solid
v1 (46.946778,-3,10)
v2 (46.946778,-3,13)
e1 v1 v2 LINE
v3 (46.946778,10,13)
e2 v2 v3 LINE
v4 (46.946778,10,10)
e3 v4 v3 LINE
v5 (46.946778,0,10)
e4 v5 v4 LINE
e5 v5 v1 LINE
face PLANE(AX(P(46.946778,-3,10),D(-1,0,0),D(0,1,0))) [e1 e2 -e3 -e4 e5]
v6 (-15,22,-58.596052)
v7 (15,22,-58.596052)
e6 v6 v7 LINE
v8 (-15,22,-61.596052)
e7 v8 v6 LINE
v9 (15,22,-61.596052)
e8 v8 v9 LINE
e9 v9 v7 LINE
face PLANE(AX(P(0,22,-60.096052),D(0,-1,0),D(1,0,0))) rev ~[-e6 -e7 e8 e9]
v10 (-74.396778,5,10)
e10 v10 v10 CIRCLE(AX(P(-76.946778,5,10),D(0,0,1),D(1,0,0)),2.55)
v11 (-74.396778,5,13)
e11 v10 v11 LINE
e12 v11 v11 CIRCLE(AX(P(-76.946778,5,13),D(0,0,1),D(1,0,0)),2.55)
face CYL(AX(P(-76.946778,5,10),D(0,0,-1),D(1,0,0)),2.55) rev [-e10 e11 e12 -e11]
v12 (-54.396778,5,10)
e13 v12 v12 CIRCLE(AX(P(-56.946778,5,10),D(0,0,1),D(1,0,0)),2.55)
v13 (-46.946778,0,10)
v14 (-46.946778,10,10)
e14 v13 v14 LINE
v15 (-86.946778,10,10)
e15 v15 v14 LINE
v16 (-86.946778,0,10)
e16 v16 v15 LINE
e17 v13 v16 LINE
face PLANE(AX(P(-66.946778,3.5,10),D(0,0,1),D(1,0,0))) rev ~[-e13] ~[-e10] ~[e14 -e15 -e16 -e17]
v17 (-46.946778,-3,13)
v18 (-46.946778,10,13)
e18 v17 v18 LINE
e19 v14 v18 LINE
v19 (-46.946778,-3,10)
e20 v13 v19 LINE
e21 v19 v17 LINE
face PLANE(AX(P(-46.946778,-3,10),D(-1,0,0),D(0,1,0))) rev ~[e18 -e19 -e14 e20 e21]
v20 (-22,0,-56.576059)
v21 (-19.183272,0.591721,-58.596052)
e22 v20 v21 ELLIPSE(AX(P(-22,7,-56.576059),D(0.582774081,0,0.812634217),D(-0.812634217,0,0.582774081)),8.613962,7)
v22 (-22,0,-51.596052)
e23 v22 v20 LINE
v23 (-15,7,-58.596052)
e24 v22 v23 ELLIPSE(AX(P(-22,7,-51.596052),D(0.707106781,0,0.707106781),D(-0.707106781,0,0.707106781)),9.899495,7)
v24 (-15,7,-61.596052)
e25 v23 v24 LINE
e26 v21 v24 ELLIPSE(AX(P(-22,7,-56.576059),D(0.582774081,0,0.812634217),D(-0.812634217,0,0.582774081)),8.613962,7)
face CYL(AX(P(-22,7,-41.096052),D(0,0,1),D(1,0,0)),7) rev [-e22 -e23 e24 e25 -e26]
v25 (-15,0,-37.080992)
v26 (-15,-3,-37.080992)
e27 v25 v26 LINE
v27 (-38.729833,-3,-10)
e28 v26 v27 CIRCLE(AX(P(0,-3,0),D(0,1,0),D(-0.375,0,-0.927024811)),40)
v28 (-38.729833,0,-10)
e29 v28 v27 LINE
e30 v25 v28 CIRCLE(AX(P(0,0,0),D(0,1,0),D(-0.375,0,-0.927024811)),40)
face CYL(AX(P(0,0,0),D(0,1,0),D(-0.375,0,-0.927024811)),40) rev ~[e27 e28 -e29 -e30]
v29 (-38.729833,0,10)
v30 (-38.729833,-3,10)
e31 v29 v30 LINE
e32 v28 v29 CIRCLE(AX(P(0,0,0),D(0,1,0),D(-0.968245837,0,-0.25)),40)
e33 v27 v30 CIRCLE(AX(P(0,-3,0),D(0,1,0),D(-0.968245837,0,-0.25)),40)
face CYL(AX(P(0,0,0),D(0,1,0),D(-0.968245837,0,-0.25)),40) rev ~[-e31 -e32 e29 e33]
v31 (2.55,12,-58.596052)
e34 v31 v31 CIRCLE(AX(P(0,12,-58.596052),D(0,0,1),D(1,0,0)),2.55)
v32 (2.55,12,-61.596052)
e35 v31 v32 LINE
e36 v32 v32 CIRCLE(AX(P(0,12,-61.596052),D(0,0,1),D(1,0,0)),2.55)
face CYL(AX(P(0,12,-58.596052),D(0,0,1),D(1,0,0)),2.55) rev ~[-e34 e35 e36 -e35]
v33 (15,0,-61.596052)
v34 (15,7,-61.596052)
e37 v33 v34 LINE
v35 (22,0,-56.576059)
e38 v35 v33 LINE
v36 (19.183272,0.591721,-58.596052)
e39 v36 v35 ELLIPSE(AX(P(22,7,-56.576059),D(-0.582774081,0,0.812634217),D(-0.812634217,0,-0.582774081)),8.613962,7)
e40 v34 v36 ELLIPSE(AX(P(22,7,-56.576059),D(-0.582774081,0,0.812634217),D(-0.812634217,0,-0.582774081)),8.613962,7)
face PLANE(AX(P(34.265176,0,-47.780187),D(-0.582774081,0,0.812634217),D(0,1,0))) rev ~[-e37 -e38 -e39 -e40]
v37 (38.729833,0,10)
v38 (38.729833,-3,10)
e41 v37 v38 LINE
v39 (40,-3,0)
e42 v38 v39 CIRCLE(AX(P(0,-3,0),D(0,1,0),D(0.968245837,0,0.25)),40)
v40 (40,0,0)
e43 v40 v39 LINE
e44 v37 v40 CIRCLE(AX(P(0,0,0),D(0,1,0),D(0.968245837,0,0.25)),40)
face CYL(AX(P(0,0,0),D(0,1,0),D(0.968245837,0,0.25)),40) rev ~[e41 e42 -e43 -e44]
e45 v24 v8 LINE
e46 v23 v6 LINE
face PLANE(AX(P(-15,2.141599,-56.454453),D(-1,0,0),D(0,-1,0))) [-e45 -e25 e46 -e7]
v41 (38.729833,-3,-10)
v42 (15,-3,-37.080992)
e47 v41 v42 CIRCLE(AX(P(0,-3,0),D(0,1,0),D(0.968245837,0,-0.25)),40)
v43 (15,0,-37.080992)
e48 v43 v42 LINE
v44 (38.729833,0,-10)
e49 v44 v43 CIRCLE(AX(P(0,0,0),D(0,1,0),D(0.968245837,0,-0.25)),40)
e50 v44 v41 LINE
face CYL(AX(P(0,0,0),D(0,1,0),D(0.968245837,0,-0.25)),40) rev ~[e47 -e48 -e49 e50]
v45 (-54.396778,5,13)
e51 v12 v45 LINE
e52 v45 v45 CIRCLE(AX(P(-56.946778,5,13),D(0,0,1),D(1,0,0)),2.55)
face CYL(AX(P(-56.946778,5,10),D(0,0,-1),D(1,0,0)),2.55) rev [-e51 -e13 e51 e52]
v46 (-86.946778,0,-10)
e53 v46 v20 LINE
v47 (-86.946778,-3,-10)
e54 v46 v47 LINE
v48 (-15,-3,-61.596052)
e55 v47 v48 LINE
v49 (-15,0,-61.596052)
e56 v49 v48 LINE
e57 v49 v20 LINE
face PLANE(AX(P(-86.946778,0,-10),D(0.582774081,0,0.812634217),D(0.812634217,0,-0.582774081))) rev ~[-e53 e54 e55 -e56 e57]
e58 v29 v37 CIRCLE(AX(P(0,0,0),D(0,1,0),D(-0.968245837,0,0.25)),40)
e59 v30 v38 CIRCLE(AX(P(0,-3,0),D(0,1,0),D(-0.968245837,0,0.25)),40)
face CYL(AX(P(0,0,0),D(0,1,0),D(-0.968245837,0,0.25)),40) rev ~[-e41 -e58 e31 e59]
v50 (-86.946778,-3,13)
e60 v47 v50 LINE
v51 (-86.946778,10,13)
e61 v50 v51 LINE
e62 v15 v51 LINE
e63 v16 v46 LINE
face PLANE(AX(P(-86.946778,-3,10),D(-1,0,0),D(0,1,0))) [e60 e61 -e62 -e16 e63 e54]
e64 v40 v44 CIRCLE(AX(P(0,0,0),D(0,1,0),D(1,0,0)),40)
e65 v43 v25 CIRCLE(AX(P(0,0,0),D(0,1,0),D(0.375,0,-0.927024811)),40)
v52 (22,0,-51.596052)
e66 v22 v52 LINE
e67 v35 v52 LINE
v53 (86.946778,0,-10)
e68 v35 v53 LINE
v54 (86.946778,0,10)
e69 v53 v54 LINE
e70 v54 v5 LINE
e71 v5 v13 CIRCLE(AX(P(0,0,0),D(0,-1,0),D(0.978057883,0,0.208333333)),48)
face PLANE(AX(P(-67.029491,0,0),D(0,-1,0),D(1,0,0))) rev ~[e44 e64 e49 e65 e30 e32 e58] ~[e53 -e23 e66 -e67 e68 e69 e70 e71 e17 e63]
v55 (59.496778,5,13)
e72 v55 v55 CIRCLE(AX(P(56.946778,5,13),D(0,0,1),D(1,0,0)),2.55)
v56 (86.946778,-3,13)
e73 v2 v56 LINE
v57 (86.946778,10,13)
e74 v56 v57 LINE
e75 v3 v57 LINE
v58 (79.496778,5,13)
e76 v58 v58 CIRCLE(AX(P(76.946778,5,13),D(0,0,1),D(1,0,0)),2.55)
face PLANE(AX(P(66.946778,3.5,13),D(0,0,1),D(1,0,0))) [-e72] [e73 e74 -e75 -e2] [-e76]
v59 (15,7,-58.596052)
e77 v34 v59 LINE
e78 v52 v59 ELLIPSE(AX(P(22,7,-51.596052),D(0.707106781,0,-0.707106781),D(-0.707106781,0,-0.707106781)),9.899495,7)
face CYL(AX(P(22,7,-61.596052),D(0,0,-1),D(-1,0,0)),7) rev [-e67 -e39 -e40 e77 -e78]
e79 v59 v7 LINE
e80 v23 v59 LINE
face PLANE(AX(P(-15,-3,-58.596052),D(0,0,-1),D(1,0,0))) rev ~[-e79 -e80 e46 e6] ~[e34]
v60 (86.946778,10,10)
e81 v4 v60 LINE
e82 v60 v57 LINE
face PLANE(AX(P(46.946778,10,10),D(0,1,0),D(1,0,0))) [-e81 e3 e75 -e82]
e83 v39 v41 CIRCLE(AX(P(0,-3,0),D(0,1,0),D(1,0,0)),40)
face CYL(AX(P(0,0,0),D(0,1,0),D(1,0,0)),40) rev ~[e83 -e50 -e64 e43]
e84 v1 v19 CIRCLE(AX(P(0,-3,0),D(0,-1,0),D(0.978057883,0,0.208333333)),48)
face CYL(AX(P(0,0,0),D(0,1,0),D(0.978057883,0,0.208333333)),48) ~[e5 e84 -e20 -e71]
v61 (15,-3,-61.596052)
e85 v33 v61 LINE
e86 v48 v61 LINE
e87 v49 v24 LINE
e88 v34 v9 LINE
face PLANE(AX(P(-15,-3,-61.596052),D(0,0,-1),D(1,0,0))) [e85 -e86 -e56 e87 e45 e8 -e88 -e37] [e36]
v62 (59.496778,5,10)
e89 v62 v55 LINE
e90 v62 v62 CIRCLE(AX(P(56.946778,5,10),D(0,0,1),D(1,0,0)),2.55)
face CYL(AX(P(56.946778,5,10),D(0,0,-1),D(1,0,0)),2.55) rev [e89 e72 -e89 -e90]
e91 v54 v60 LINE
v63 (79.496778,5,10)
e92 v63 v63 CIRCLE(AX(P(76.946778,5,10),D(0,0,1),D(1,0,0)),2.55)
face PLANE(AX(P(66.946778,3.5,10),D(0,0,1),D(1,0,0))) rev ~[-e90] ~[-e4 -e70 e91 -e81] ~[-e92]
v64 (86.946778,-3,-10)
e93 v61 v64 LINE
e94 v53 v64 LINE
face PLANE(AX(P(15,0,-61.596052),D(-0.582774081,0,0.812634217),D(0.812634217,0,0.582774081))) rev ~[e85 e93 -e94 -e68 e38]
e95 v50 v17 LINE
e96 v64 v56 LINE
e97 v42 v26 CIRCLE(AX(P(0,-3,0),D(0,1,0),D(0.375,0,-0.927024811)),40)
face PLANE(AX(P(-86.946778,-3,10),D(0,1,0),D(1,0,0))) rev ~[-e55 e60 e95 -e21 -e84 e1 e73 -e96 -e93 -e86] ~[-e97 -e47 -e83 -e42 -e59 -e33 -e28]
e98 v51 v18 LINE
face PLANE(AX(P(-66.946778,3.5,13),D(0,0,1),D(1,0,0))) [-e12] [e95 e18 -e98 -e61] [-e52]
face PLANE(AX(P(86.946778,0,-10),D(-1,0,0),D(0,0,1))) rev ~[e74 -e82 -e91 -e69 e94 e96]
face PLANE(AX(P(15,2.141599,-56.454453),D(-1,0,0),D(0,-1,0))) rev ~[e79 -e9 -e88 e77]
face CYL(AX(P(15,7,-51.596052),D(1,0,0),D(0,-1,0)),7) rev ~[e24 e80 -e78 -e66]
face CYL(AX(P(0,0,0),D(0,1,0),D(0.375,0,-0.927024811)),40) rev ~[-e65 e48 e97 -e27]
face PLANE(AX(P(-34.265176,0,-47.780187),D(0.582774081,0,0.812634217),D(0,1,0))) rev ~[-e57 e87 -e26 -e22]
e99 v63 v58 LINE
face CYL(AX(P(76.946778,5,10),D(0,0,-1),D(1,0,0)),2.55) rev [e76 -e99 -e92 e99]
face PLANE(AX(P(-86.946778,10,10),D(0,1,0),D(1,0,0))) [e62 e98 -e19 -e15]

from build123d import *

# Parameters (mm, degrees)
F0_W         = 30
F0_H         = 3
F1_DEPTH     = 3
F2_W         = 40
F2_H         = 13
F2_R         = 2.55
F3_DEPTH     = 3
F4_W         = 30
F4_H         = 3
F5_DEPTH     = 25
F6_R         = 2.55
F7_DEPTH     = 3
F8_T1_DEPTH  = 30
F8_T6_DEPTH  = 20.5
F8_T11_DEPTH = 20.5
F8_T17_DEPTH = 20.5
F8_T22_DEPTH = 47.5
F8_T30_DEPTH = 20.5
F8_T35_DEPTH = 47.5


# Not quite as in the source:
# - a fillet or chamfer that OpenCascade refuses, or shapes differently, is made with other operations: its cross-section is extruded or revolved along the edge and cut away or added
# - a feature names something its author has since deleted; it is built from what else it names


with BuildPart() as f1:
    # F0 (on Front) → F1 (new body)
    with BuildSketch(Plane.XZ):
        with BuildLine():
            ThreePointArc((-46.9467783772, -10), (-48, 0), (-46.9467783772, 10))
            Line((-46.9467783772, 10), (-86.9467783772, 10))
            Line((-86.9467783772, 10), (-86.9467783772, -10))
            Line((-86.9467783772, -10), (-46.9467783772, -10))
        make_face()
        with BuildLine():
            Line((86.9467783772, 10), (46.9467783772, 10))
            ThreePointArc((46.9467783772, 10), (47.7359684206, 5.0276554125), (48, 0))
            ThreePointArc((48, 0), (47.7359684206, -5.0276554125), (46.9467783772, -10))
            Line((46.9467783772, -10), (86.9467783772, -10))
            Line((86.9467783772, -10), (86.9467783772, 10))
        make_face()
        with BuildLine():
            Line((15, -58.5960524607), (15, -45.5960524607))
            ThreePointArc((15, -45.5960524607), (0, -48), (-15, -45.5960524607))
            Line((-15, -45.5960524607), (-15, -58.5960524607))
            Line((-15, -58.5960524607), (15, -58.5960524607))
        make_face()
        with BuildLine():
            ThreePointArc((-38.7298334621, 10), (0, 40), (38.7298334621, 10))
            Line((38.7298334621, 10), (46.9467783772, 10))
            ThreePointArc((46.9467783772, 10), (0, 48), (-46.9467783772, 10))
            Line((-46.9467783772, 10), (-38.7298334621, 10))
        make_face()
        with BuildLine():
            ThreePointArc((-15, -37.0809924355), (-30.0843611996, -26.3615479669), (-38.7298334621, -10))
            Line((-38.7298334621, -10), (-46.9467783772, -10))
            ThreePointArc((-46.9467783772, -10), (-35.7228298925, -32.060558705), (-15, -45.5960524607))
            Line((-15, -45.5960524607), (-15, -37.0809924355))
        make_face()
        with BuildLine():
            Line((46.9467783772, -10), (38.7298334621, -10))
            ThreePointArc((38.7298334621, -10), (30.0843611996, -26.3615479669), (15, -37.0809924355))
            Line((15, -37.0809924355), (15, -45.5960524607))
            ThreePointArc((15, -45.5960524607), (35.7228298925, -32.060558705), (46.9467783772, -10))
        make_face()
        with BuildLine():
            ThreePointArc((-38.7298334621, -10), (-40, 0), (-38.7298334621, 10))
            Line((-38.7298334621, 10), (-46.9467783772, 10))
            ThreePointArc((-46.9467783772, 10), (-48, 0), (-46.9467783772, -10))
            Line((-46.9467783772, -10), (-38.7298334621, -10))
        make_face()
        with BuildLine():
            Line((15, -45.5960524607), (15, -37.0809924355))
            ThreePointArc((15, -37.0809924355), (0, -40), (-15, -37.0809924355))
            Line((-15, -37.0809924355), (-15, -45.5960524607))
            ThreePointArc((-15, -45.5960524607), (0, -48), (15, -45.5960524607))
        make_face()
        with BuildLine():
            ThreePointArc((38.7298334621, 10), (39.6811878507, 5.0401716993), (40, 0))
            ThreePointArc((40, 0), (39.6811878507, -5.0401716993), (38.7298334621, -10))
            Line((38.7298334621, -10), (46.9467783772, -10))
            ThreePointArc((46.9467783772, -10), (47.7359684206, -5.0276554125), (48, 0))
            ThreePointArc((48, 0), (47.7359684206, 5.0276554125), (46.9467783772, 10))
            Line((46.9467783772, 10), (38.7298334621, 10))
        make_face()
        with Locations((0, -60.0960524607)):
            Rectangle(F0_W, F0_H)
        with BuildLine():
            ThreePointArc((-15, -45.5960524607), (-35.7228298925, -32.060558705), (-46.9467783772, -10))
            Line((-46.9467783772, -10), (-86.9467783772, -10))
            Line((-86.9467783772, -10), (-15, -61.5960524607))
            Line((-15, -61.5960524607), (-15, -58.5960524607))
            Line((-15, -58.5960524607), (-15, -45.5960524607))
        make_face()
        with BuildLine():
            Line((86.9467783772, -10), (46.9467783772, -10))
            ThreePointArc((46.9467783772, -10), (35.7228298925, -32.060558705), (15, -45.5960524607))
            Line((15, -45.5960524607), (15, -58.5960524607))
            Line((15, -58.5960524607), (15, -61.5960524607))
            Line((15, -61.5960524607), (86.9467783772, -10))
        make_face()
    extrude(amount=F1_DEPTH)

    # F2 (on face) → F3 (join)
    with BuildSketch(Plane.XY.offset(10)):
        with Locations((-66.9467783772, 3.5)):
            Rectangle(F2_W, F2_H)
        with Locations((-76.9467783772, 5)):
            Circle(F2_R, mode=Mode.SUBTRACT)
        with Locations((-56.9467783772, 5)):
            Circle(F2_R, mode=Mode.SUBTRACT)
        with Locations((66.9467783772, 3.5)):
            Rectangle(F2_W, F2_H)
        with Locations((56.9467783772, 5)):
            Circle(F2_R, mode=Mode.SUBTRACT)
        with Locations((76.9467783772, 5)):
            Circle(F2_R, mode=Mode.SUBTRACT)
    extrude(amount=F3_DEPTH)

    # F4 (on face) → F5 (join)
    with BuildSketch(Plane.XZ.offset(3)):
        with Locations((0, -60.0960524607)):
            Rectangle(F4_W, F4_H)
    extrude(amount=-F5_DEPTH)

    # F6 (on face) → F7 (cut, through all)
    with BuildSketch(Plane.XY.offset(-58.5960524607)):
        with Locations((0, 12)):
            Circle(F6_R)
    extrude(amount=-F7_DEPTH, mode=Mode.SUBTRACT)

    # F8: fillet of radius 7 on 3 edges, made by hand

    # F8_s2 → F8_t1 (join)
    with BuildSketch(Plane.YZ.offset(-15)):
        with BuildLine():
            ThreePointArc((0, -51.5960524607), (2.0502525317, -56.545799929), (7, -58.5960524607))
            Line((7, -58.5960524607), (0, -58.5960524607))
            Line((0, -58.5960524607), (0, -51.5960524607))
        make_face()
    extrude(amount=F8_T1_DEPTH)


with BuildPart() as f8_tool4:
    # F8_s5 → F8_t6 (new body)
    with BuildSketch(Plane.XY.offset(-58.5960524607)):
        with BuildLine():
            ThreePointArc((-15, 7), (-17.0502525317, 2.0502525317), (-22, 0))
            Line((-22, 0), (-15, 0))
            Line((-15, 0), (-15, 7))
        make_face()
    extrude(amount=-F8_T6_DEPTH)

    split(bisect_by=Plane(origin=(-34.2651759644, 0, -47.7801867313), x_dir=(0, 1, 0), z_dir=(0.5827740813, 0, 0.8126342167)), keep=Keep.TOP)


with BuildPart() as f1_1:
    add(f1.part)

    # F8_t3: union F8_tool4
    add(f8_tool4.part)


with BuildPart() as f8_tool9:
    # F8_s10 → F8_t11 (new body)
    with BuildSketch(Plane.XY.offset(-79.0960524607)):
        with BuildLine():
            ThreePointArc((15, 7), (17.0502525317, 2.0502525317), (22, 0))
            Line((22, 0), (15, 0))
            Line((15, 0), (15, 7))
        make_face()
    extrude(amount=F8_T11_DEPTH)

    split(bisect_by=Plane(origin=(34.2651759644, 0, -47.7801867313), x_dir=(0, 1, 0), z_dir=(-0.5827740813, 0, 0.8126342167)), keep=Keep.TOP)


with BuildPart() as f1_2:
    add(f1_1.part)

    # F8_t8: union F8_tool9
    add(f8_tool9.part)


with BuildPart() as f8_tool15:
    # F8_s16 → F8_t17 (new body)
    with BuildSketch(Plane.XY.offset(-61.5960524607)):
        with BuildLine():
            ThreePointArc((15, 7), (17.0502525317, 2.0502525317), (22, 0))
            Line((22, 0), (15, 0))
            Line((15, 0), (15, 7))
        make_face()
    extrude(amount=F8_T17_DEPTH)

    split(bisect_by=Plane(origin=(34.2651759644, 0, -47.7801867313), x_dir=(0, 1, 0), z_dir=(-0.5827740813, 0, 0.8126342167)), keep=Keep.TOP)

    split(bisect_by=Plane.XY.offset(-58.5960524607), keep=Keep.TOP)


with BuildPart() as f8_tool20:
    # F8_s21 → F8_t22 (new body)
    with BuildSketch(Plane.YZ.offset(32.5)):
        with BuildLine():
            ThreePointArc((0, -51.5960524607), (2.0502525317, -56.545799929), (7, -58.5960524607))
            Line((7, -58.5960524607), (0, -58.5960524607))
            Line((0, -58.5960524607), (0, -51.5960524607))
        make_face()
    extrude(amount=-F8_T22_DEPTH)

    split(bisect_by=Plane(origin=(34.2651759644, 0, -47.7801867313), x_dir=(0, 1, 0), z_dir=(-0.5827740813, 0, 0.8126342167)), keep=Keep.TOP)

    split(bisect_by=Plane.YZ.offset(15), keep=Keep.TOP)


with BuildPart() as f8_tool15_1:
    add(f8_tool15.part)

    # F8_t25: intersect F8_tool20
    add(f8_tool20.part, mode=Mode.INTERSECT)


with BuildPart() as f1_3:
    add(f1_2.part)

    # F8_t13: union F8_tool15
    add(f8_tool15_1.part)


with BuildPart() as f8_tool28:
    # F8_s29 → F8_t30 (new body)
    with BuildSketch(Plane.XY.offset(-41.0960524607)):
        with BuildLine():
            ThreePointArc((-15, 7), (-17.0502525317, 2.0502525317), (-22, 0))
            Line((-22, 0), (-15, 0))
            Line((-15, 0), (-15, 7))
        make_face()
    extrude(amount=-F8_T30_DEPTH)

    split(bisect_by=Plane(origin=(-34.2651759644, 0, -47.7801867313), x_dir=(0, 1, 0), z_dir=(0.5827740813, 0, 0.8126342167)), keep=Keep.TOP)

    split(bisect_by=Plane.XY.offset(-58.5960524607), keep=Keep.TOP)


with BuildPart() as f8_tool33:
    # F8_s34 → F8_t35 (new body)
    with BuildSketch(Plane.YZ.offset(15)):
        with BuildLine():
            ThreePointArc((0, -51.5960524607), (2.0502525317, -56.545799929), (7, -58.5960524607))
            Line((7, -58.5960524607), (0, -58.5960524607))
            Line((0, -58.5960524607), (0, -51.5960524607))
        make_face()
    extrude(amount=-F8_T35_DEPTH)

    split(bisect_by=Plane(origin=(-34.2651759644, 0, -47.7801867313), x_dir=(0, 1, 0), z_dir=(0.5827740813, 0, 0.8126342167)), keep=Keep.TOP)

    split(bisect_by=Plane.YZ.offset(-15), keep=Keep.BOTTOM)


with BuildPart() as f8_tool28_1:
    add(f8_tool28.part)

    # F8_t38: intersect F8_tool33
    add(f8_tool33.part, mode=Mode.INTERSECT)


with BuildPart() as f1_4:
    add(f1_3.part)

    # F8_t26: union F8_tool28
    add(f8_tool28_1.part)


solid = f1_4.part
